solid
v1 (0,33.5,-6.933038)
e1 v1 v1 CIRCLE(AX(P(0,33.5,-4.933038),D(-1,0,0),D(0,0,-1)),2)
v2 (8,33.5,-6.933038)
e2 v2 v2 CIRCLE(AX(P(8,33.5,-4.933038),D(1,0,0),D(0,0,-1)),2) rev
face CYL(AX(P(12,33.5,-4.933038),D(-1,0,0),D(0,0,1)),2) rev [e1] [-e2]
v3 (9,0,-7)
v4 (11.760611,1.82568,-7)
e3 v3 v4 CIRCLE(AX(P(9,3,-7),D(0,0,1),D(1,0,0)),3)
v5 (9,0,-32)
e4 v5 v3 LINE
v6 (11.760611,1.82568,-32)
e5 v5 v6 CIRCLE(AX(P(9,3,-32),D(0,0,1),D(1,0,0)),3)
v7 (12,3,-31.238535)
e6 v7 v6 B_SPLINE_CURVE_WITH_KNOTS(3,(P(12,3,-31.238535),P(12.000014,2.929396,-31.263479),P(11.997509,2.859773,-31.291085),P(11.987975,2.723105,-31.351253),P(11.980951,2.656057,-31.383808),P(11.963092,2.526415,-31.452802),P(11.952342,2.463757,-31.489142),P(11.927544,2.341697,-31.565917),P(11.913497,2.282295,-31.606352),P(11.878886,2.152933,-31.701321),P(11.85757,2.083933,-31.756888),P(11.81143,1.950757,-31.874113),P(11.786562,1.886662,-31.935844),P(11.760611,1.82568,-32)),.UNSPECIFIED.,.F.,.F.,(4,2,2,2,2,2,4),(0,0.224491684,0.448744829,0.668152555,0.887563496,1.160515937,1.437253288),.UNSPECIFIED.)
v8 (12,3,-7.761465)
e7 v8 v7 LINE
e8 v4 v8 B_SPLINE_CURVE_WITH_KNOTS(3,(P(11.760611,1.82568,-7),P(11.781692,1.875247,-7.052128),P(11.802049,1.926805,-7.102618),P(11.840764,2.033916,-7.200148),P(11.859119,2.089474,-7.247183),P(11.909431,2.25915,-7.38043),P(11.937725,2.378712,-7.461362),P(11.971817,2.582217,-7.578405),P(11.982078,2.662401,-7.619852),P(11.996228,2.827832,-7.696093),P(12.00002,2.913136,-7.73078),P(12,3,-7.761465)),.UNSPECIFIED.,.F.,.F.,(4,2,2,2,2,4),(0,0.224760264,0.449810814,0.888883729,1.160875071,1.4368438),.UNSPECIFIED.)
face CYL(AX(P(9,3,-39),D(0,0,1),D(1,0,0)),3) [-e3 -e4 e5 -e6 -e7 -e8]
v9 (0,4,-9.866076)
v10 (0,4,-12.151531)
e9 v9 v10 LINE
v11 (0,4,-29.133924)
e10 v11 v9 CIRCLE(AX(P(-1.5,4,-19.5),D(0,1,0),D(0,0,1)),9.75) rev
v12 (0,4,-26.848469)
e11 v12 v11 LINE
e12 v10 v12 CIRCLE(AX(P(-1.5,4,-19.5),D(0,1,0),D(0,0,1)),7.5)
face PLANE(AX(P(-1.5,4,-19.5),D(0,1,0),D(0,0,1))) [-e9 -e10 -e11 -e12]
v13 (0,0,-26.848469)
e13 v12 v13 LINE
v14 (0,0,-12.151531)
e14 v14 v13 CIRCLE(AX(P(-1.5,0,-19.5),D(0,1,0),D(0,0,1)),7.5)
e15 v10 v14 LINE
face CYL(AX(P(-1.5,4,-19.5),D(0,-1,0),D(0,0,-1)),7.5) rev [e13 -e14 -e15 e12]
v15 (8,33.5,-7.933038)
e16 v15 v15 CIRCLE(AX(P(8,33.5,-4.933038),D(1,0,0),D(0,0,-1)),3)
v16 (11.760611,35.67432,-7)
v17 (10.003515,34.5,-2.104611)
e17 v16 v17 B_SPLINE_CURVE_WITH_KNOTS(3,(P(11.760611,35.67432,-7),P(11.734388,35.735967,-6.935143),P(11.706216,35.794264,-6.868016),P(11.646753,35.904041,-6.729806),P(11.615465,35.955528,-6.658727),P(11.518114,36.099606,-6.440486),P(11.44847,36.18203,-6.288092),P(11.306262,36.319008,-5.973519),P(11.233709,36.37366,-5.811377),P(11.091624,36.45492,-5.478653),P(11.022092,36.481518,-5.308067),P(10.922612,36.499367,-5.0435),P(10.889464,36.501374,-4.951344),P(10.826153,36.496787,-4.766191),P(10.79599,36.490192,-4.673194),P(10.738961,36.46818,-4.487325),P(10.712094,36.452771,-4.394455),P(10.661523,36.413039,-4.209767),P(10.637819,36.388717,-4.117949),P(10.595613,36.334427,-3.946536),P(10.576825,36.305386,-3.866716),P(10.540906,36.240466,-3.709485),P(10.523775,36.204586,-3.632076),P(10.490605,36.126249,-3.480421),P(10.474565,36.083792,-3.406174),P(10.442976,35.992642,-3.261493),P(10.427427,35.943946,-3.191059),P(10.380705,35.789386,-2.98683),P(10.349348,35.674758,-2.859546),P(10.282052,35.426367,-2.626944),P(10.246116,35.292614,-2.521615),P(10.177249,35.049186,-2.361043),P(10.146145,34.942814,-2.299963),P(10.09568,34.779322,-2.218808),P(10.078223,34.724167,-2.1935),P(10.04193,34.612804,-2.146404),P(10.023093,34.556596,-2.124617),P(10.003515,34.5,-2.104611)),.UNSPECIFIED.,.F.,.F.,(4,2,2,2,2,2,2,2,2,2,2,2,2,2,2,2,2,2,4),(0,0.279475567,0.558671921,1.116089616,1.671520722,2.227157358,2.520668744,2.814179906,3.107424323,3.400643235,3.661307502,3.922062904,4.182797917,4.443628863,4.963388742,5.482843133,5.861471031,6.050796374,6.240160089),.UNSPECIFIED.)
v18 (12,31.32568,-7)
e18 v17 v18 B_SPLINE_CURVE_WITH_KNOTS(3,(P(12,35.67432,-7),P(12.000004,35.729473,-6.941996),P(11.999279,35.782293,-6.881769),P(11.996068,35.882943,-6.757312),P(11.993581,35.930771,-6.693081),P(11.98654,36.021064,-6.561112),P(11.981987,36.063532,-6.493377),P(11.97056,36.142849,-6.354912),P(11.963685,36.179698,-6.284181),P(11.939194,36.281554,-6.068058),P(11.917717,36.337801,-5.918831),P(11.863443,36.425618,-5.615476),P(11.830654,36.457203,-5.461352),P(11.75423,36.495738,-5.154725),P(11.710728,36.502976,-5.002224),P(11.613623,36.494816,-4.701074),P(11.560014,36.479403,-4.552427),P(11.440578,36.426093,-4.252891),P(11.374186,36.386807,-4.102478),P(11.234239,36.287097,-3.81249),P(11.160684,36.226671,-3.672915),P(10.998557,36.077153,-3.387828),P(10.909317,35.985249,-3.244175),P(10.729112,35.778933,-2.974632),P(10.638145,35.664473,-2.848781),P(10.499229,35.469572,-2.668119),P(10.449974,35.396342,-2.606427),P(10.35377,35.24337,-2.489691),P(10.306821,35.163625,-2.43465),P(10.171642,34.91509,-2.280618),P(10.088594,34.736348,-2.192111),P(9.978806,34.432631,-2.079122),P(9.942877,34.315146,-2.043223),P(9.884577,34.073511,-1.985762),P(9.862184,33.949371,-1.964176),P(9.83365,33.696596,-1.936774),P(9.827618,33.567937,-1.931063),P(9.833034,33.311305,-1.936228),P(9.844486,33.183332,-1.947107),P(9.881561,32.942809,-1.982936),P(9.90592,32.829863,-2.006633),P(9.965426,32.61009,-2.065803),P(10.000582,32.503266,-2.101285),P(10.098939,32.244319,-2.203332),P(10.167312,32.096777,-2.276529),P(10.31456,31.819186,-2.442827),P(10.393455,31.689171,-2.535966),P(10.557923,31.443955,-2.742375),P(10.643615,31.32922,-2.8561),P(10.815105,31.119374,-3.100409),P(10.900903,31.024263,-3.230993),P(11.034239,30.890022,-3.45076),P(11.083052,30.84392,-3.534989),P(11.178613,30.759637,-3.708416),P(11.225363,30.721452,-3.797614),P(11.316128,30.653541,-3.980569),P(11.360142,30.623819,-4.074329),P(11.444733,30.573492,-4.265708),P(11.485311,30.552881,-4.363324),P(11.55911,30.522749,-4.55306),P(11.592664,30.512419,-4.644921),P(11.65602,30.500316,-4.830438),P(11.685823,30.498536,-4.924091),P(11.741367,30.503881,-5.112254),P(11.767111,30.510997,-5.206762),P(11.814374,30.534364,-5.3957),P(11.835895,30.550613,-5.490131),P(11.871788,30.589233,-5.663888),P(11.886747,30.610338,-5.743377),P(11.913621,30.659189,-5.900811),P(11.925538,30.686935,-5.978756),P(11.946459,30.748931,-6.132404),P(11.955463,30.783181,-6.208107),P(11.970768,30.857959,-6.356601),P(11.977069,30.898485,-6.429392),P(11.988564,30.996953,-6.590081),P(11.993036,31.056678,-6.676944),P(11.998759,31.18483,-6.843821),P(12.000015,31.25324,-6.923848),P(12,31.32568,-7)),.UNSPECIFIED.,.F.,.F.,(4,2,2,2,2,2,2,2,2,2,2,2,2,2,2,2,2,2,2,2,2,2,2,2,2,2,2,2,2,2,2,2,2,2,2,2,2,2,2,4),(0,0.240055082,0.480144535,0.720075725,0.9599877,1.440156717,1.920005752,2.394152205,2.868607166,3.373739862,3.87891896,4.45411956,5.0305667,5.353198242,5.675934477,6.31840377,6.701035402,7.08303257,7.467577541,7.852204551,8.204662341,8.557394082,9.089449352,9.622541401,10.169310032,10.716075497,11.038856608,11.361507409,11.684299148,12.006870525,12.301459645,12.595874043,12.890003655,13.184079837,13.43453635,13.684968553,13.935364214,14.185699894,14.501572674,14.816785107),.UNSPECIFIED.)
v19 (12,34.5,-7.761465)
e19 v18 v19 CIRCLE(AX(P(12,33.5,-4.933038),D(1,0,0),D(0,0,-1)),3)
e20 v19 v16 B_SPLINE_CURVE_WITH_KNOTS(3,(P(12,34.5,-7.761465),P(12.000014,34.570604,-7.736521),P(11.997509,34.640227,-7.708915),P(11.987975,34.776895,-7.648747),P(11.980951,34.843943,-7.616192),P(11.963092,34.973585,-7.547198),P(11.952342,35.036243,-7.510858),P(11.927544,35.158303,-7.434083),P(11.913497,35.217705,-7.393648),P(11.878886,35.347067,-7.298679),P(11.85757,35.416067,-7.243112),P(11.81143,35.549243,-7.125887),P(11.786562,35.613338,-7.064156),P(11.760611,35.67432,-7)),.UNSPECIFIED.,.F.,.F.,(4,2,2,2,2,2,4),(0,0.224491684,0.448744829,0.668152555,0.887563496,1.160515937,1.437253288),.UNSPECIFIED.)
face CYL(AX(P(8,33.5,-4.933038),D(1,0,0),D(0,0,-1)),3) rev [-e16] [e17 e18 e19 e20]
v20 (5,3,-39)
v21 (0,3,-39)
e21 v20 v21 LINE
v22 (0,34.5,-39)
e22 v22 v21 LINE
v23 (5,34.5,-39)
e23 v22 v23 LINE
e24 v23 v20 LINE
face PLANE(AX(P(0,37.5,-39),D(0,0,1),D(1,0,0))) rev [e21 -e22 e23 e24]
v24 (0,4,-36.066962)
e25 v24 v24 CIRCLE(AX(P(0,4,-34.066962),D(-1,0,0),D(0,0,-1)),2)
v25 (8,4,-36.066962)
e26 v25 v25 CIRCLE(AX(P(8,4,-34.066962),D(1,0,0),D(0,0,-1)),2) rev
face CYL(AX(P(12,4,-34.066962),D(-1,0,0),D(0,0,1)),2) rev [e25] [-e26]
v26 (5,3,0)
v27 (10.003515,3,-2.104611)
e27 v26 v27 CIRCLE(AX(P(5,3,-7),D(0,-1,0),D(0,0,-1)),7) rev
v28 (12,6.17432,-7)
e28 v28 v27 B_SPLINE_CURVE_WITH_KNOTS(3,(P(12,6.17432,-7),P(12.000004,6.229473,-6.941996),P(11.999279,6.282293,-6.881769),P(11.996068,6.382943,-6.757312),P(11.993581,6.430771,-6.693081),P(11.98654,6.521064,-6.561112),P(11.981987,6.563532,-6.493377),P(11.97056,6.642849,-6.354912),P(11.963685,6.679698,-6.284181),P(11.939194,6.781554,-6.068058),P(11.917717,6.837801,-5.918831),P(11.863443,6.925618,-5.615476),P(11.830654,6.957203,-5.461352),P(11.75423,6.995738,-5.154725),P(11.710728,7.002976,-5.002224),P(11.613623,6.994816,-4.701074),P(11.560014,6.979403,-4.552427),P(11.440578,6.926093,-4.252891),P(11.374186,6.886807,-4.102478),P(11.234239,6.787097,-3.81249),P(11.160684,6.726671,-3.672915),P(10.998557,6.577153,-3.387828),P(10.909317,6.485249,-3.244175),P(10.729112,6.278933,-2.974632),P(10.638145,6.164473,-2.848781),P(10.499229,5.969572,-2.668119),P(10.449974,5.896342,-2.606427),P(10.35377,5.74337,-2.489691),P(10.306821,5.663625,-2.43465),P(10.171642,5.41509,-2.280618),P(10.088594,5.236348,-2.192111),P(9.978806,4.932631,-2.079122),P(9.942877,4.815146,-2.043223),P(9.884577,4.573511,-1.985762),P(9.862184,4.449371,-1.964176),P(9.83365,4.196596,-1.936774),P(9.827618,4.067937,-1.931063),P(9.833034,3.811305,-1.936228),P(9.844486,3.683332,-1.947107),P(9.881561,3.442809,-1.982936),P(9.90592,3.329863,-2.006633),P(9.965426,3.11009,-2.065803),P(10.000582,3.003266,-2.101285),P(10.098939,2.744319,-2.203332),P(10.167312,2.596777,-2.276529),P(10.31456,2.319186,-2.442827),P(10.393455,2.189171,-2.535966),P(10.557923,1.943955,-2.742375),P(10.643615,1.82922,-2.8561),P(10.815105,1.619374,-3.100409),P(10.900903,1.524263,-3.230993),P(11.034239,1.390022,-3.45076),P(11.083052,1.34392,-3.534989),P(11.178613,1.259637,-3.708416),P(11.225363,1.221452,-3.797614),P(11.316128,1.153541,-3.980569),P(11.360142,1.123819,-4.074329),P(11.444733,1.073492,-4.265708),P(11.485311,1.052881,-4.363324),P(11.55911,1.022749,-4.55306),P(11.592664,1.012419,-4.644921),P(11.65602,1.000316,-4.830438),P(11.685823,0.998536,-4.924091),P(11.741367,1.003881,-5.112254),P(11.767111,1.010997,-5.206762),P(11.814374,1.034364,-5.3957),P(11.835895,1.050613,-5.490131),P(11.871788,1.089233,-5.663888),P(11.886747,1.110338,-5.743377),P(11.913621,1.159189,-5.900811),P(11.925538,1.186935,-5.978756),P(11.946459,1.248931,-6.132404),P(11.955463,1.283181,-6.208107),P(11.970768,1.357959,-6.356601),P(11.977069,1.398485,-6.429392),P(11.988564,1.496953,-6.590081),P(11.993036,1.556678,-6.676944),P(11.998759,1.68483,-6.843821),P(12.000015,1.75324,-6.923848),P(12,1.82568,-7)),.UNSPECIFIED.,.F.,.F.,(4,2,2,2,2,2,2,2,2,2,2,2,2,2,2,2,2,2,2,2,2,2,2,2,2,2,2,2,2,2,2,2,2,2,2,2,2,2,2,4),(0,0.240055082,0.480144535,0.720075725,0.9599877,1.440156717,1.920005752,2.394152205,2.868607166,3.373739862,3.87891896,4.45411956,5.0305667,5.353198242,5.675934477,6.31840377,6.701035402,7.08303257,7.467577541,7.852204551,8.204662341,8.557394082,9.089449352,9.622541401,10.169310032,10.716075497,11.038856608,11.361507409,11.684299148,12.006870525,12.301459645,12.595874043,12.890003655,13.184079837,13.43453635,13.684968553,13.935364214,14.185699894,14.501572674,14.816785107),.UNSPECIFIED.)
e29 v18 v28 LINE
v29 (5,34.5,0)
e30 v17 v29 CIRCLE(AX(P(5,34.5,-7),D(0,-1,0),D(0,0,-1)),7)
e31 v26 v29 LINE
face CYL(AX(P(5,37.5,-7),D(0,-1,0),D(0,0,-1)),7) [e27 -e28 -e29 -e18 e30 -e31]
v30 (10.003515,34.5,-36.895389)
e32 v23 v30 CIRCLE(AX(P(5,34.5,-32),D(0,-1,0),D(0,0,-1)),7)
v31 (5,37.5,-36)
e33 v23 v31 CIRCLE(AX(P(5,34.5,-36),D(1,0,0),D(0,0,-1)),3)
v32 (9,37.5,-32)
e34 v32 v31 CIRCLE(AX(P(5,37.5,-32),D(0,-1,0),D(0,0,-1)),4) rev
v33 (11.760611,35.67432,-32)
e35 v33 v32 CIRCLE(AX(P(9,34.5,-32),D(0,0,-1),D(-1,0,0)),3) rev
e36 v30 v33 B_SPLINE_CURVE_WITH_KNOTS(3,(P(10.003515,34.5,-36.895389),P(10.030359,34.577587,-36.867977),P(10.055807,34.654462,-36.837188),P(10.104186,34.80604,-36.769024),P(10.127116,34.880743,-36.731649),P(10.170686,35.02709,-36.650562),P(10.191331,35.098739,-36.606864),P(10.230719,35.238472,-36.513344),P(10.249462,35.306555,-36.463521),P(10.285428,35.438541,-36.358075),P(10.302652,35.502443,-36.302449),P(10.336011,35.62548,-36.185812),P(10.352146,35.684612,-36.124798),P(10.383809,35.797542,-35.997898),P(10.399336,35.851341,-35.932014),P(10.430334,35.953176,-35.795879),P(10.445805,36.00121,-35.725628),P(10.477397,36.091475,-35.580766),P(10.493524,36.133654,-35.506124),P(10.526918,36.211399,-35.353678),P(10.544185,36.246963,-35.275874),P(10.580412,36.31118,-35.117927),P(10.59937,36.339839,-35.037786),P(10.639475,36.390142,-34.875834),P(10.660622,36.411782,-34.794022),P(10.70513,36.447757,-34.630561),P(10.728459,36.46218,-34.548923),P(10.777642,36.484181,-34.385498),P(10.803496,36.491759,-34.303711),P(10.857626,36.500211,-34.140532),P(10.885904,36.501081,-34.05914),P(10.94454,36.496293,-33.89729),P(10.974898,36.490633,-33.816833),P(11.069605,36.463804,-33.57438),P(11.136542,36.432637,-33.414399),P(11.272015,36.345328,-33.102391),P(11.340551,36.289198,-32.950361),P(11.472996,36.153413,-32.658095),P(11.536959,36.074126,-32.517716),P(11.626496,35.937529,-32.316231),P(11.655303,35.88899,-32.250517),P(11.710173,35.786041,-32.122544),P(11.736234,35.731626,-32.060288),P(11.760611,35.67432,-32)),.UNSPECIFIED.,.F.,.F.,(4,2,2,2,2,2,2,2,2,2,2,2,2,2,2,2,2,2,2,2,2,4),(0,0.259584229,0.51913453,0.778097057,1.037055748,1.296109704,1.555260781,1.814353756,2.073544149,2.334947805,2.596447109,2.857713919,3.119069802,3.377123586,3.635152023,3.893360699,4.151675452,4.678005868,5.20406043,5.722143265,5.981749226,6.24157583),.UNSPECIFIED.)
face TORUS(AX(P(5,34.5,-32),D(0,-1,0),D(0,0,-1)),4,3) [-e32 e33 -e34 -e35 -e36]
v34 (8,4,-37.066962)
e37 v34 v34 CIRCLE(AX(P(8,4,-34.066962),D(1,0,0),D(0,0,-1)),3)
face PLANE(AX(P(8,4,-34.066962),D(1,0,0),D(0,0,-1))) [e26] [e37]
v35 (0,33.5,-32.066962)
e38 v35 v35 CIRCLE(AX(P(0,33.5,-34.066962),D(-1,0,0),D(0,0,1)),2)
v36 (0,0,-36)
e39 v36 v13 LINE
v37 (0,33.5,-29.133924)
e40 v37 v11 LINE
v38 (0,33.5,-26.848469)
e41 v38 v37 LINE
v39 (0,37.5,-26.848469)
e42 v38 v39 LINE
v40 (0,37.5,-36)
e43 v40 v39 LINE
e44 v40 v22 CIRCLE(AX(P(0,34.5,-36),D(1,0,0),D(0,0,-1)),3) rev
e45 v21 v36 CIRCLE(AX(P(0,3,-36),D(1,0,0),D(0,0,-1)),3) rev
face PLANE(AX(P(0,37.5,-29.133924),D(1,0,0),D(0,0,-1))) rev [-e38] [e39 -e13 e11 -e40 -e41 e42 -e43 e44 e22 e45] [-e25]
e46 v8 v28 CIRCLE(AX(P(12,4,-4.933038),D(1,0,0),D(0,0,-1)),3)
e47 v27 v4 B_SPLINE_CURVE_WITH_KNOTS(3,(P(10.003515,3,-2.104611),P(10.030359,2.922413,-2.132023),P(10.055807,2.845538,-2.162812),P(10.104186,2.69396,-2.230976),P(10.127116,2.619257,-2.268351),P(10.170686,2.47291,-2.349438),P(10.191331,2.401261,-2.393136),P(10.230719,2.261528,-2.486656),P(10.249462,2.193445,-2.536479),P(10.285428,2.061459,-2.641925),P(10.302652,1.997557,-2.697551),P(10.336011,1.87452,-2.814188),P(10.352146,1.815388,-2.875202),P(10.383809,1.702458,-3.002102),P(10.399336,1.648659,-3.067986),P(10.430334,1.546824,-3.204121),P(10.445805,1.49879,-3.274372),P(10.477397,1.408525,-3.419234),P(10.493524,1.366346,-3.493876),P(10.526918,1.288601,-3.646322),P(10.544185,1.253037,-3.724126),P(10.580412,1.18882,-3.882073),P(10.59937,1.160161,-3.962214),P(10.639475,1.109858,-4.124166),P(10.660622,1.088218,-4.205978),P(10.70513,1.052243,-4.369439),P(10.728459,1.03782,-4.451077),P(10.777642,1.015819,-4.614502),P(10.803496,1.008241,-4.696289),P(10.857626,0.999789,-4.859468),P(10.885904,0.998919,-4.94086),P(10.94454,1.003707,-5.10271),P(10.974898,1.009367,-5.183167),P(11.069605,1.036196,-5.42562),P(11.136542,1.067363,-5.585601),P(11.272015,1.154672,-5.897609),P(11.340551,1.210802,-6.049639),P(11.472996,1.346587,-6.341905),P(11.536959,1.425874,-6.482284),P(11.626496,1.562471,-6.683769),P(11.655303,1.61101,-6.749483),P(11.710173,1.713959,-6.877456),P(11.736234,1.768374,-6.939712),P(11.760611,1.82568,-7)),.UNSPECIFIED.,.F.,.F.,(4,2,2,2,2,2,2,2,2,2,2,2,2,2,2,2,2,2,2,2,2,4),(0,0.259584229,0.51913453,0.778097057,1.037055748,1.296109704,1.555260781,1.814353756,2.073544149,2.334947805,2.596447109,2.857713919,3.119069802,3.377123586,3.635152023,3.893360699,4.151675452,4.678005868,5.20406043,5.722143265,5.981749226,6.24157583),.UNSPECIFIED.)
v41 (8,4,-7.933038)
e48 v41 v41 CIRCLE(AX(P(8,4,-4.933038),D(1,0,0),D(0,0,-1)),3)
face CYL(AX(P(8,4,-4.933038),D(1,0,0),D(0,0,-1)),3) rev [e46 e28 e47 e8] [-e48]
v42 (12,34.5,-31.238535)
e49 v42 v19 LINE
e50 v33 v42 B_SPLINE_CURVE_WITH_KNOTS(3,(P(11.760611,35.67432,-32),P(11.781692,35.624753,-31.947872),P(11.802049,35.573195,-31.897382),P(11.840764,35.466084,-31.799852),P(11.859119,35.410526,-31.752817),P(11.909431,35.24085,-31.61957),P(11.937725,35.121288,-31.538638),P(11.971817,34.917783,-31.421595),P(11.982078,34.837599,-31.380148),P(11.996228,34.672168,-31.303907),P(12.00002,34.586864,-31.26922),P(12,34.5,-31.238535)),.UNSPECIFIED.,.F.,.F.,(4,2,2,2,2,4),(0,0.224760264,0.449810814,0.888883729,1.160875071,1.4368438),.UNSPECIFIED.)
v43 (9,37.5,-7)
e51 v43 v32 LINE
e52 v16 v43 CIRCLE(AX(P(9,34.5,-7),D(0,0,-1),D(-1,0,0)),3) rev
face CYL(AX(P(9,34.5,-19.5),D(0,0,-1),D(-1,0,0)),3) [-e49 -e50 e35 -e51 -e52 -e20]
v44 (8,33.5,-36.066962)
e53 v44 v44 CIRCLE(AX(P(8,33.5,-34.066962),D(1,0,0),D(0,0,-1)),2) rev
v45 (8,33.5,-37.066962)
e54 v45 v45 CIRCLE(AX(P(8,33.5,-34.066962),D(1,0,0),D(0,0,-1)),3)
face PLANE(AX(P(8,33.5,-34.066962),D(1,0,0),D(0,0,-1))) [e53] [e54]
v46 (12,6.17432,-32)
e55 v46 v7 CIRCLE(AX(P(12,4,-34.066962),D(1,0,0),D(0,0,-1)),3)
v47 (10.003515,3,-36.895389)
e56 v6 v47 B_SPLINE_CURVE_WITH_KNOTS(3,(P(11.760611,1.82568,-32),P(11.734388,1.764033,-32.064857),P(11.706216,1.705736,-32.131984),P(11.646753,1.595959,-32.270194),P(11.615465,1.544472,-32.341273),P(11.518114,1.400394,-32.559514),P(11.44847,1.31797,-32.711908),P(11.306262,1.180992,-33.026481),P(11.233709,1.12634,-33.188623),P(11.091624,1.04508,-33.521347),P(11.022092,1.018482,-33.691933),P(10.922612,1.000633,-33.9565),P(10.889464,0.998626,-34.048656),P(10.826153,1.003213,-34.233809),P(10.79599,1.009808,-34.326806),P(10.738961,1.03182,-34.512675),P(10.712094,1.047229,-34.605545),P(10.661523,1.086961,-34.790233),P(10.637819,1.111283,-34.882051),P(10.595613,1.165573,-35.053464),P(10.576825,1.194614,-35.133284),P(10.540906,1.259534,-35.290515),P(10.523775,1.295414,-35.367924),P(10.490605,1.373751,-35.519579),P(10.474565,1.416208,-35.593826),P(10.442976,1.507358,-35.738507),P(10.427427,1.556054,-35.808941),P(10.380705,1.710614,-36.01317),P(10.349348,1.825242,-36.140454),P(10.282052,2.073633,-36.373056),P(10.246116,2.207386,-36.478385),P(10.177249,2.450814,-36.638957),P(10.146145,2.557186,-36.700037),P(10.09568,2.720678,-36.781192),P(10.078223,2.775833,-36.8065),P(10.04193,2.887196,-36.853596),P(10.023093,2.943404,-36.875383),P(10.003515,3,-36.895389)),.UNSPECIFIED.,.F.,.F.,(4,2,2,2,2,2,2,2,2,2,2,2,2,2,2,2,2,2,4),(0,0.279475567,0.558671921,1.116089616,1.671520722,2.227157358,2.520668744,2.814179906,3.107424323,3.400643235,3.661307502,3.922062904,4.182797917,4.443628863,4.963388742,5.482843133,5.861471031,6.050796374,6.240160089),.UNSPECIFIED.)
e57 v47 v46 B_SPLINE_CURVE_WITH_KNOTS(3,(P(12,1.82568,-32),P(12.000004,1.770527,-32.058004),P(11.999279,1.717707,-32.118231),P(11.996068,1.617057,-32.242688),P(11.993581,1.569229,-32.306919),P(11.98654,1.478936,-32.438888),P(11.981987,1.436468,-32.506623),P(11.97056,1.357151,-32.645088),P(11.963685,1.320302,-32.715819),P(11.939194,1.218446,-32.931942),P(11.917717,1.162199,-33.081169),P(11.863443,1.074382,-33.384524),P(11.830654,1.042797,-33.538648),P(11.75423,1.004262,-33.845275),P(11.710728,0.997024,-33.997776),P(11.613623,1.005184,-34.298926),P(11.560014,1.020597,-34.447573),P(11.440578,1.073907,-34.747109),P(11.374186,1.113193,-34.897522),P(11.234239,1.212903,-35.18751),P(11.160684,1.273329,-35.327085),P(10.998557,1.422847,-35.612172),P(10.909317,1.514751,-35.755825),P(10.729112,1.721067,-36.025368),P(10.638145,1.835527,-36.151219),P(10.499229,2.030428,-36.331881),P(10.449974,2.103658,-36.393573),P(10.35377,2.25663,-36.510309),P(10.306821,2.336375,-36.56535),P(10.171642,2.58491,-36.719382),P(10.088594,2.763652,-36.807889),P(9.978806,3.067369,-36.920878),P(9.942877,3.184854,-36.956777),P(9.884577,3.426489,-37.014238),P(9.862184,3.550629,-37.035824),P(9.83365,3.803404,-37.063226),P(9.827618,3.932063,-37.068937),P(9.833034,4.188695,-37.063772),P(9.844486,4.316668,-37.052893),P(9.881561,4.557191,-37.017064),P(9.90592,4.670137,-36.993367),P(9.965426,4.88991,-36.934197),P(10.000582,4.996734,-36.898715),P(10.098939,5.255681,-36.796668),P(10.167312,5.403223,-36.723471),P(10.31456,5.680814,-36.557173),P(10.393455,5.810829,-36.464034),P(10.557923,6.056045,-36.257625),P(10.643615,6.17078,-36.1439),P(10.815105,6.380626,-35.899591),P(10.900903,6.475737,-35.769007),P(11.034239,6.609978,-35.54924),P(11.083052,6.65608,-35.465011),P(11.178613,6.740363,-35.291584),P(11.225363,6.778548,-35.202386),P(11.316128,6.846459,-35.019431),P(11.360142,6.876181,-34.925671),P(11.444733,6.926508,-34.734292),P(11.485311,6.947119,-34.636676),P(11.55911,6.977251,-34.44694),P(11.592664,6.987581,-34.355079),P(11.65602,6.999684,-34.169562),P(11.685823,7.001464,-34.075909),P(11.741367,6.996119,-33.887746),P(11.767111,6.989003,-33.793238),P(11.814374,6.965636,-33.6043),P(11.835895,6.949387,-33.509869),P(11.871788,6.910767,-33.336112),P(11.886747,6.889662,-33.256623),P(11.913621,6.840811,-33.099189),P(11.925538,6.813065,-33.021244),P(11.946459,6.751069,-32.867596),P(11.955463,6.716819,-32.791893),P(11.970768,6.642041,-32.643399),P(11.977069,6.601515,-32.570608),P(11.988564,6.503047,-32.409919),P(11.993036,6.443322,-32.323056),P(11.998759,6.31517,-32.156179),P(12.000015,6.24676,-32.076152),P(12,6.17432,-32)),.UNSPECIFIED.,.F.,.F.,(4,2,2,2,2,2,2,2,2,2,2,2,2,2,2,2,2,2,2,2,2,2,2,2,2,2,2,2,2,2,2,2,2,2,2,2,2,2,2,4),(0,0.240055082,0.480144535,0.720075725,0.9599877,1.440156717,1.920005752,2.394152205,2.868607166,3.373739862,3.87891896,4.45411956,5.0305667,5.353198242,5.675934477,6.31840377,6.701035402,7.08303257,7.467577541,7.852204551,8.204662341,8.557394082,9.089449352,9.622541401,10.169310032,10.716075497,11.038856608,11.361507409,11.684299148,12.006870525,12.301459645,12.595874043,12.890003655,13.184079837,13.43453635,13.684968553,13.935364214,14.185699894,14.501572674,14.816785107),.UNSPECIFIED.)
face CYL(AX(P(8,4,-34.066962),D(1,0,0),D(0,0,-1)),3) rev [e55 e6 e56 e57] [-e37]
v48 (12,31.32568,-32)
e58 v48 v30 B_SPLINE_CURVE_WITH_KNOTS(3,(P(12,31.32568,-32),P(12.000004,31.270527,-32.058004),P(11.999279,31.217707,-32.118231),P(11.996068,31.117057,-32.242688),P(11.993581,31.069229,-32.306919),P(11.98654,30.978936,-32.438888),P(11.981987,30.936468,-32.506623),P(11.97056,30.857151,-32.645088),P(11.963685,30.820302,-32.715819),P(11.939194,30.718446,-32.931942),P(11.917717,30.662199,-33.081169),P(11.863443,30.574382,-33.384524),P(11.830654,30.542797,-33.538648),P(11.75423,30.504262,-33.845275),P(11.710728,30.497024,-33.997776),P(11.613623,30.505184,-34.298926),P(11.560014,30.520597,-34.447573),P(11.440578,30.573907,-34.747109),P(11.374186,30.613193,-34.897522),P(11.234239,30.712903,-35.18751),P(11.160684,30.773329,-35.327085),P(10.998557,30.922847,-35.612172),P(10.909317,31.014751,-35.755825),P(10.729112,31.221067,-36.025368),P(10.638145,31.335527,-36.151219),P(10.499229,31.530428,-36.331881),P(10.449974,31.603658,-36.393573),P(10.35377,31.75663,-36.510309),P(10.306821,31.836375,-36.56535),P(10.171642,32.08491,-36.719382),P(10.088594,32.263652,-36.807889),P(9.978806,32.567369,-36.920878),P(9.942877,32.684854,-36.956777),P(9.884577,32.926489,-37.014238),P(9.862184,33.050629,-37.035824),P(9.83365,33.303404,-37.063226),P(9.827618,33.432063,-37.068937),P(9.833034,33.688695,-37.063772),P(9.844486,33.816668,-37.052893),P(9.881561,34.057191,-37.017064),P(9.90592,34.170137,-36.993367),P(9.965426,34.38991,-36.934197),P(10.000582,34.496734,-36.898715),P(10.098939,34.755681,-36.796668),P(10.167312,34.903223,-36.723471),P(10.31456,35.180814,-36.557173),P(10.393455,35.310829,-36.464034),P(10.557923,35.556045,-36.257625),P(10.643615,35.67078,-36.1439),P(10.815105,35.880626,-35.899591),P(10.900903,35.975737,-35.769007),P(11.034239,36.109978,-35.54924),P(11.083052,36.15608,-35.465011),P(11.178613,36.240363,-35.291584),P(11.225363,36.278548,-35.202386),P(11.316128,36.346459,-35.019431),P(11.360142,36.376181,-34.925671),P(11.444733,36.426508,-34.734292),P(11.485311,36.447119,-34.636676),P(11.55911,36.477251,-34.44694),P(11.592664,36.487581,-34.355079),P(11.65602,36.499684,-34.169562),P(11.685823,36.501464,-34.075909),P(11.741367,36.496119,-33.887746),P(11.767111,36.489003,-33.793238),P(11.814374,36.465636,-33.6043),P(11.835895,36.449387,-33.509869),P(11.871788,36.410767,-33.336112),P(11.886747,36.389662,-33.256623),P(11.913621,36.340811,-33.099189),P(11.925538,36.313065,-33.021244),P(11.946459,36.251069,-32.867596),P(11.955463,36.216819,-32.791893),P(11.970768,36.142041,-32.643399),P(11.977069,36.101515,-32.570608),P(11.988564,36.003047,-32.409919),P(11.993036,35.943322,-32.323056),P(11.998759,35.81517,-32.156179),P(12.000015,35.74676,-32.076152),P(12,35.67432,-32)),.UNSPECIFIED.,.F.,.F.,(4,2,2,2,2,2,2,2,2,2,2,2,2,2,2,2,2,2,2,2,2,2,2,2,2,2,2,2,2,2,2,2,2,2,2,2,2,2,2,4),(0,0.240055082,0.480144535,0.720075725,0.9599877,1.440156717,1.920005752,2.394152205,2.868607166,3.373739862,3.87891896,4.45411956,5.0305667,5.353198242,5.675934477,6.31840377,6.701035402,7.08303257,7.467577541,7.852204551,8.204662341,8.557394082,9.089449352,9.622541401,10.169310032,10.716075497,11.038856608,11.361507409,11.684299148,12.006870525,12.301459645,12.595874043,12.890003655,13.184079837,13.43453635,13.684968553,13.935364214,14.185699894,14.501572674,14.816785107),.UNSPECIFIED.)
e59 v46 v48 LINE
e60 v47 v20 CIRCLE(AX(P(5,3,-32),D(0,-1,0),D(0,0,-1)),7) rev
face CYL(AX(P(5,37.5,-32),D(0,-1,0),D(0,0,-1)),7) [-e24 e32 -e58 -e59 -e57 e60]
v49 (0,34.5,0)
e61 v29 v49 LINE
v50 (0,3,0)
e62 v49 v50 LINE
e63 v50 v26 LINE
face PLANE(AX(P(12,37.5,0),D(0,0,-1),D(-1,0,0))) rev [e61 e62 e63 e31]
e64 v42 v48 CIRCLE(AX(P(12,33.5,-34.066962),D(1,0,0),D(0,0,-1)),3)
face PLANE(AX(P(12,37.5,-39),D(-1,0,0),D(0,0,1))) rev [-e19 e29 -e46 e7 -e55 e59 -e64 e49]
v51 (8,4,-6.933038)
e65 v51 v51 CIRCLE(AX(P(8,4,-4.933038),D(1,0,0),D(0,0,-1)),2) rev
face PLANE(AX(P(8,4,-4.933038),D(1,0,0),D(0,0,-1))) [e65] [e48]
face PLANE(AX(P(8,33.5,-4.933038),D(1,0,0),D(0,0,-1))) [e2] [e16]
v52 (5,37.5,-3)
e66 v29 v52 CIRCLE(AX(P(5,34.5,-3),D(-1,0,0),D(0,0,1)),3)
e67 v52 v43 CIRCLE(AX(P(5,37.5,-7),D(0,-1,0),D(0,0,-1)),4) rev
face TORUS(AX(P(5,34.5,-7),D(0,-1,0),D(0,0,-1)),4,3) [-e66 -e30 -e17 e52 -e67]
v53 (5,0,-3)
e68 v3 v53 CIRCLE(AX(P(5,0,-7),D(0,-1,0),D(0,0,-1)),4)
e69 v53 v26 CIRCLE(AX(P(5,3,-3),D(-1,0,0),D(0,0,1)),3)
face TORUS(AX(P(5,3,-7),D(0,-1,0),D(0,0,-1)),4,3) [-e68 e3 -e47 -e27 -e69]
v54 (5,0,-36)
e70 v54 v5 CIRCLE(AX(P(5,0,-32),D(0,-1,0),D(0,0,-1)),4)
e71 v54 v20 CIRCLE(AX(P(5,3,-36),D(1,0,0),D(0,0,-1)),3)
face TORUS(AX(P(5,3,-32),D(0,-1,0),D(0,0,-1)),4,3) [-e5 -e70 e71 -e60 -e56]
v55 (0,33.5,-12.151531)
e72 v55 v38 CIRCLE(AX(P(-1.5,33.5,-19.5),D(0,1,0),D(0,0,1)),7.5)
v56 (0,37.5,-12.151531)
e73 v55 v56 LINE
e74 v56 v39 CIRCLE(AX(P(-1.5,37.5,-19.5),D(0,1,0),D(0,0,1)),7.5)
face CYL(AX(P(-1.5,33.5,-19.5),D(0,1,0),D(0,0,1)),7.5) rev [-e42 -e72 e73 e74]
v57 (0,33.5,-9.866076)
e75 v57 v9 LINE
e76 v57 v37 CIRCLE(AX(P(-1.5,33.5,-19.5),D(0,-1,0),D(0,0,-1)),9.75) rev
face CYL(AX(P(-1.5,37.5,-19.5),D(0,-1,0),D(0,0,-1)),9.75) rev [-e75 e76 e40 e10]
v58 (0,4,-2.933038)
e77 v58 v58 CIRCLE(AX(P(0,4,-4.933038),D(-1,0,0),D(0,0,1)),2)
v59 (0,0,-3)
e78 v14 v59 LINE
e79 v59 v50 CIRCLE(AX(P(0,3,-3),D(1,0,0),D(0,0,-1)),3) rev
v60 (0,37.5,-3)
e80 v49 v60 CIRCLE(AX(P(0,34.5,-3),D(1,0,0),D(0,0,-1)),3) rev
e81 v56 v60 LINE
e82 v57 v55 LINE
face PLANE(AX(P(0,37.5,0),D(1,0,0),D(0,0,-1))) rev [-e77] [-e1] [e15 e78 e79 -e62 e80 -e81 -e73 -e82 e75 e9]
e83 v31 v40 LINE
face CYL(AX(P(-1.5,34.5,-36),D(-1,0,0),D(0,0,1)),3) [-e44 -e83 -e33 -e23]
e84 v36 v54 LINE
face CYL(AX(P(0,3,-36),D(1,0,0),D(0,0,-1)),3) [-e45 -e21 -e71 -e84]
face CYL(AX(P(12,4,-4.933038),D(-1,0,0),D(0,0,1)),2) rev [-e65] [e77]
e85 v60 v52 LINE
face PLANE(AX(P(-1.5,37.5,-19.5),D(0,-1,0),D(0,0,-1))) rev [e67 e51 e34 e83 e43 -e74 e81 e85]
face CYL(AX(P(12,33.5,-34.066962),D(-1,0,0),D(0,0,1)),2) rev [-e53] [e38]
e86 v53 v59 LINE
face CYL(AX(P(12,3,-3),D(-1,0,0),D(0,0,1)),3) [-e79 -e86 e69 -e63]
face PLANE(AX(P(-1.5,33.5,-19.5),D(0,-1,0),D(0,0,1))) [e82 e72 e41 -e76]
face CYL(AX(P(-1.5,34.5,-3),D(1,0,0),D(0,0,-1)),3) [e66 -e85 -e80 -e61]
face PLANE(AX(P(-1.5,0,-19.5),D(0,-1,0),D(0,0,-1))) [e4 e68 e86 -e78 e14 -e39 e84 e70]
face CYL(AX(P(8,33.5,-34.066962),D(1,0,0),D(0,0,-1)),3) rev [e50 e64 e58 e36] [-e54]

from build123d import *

# Parameters (mm, degrees)
BOSS_EXTRU_1_DEPTH      = 37.5
BOSS_EXTRU_2_DEPTH      = 4
ESQUISSE3_R             = 2
ENL_V_MAT_EXTRU_1_DEPTH = 56.418859606
ESQUISSE5_R             = 3
ENL_V_MAT_EXTRU_2_DEPTH = 4
CONG_1_R                = 7
CONG_2_R                = 3


with BuildPart() as part:
    # Esquisse1 → Boss.-Extru.1 (new body)
    with BuildSketch(Plane(origin=(0, 0, 0), x_dir=(1, 0, 0), z_dir=(0, 1, 0))):
        with BuildLine():
            Line((0, 29.133924434), (0, 39))
            Line((0, 39), (12, 39))
            Line((12, 39), (12, 0))
            Line((12, 0), (0, 0))
            Line((0, 0), (0, 9.866075566))
            ThreePointArc((0, 9.866075566), (8.25, 19.5), (0, 29.133924434))
        make_face()
    extrude(amount=BOSS_EXTRU_1_DEPTH)

    # Esquisse2 → Boss.-Extru.2 (add)
    with BuildSketch(Plane.XZ):
        with BuildLine():
            Line((0, 0), (12, 0))
            Line((12, 0), (12, -39))
            Line((12, -39), (0, -39))
            Line((0, -39), (0, -26.848469228))
            ThreePointArc((0, -26.848469228), (6, -19.5), (0, -12.151530772))
            Line((0, -12.151530772), (0, 0))
        make_face()
    boss_extru_2 = extrude(amount=-BOSS_EXTRU_2_DEPTH)

    # Symétrie1: Boss.-Extru.2 across plane
    add(boss_extru_2.mirror(Plane.ZX.offset(18.75)))

    # Esquisse3 → Enlèv. mat.-Extru.1 (cut, through all)
    with BuildSketch(Plane.ZY):
        with Locations((-34.066962217, 33.5)):
            Circle(ESQUISSE3_R)
        with Locations(Location((-34.066962217, 4, 0), (0, 0, 180))):
            Circle(ESQUISSE3_R)
        with Locations((-4.933037783, 4)):
            Circle(ESQUISSE3_R)
        with Locations(Location((-4.933037783, 33.5, 0), (0, 0, 180))):
            Circle(ESQUISSE3_R)
    extrude(amount=-ENL_V_MAT_EXTRU_1_DEPTH, mode=Mode.SUBTRACT)

    # Esquisse5 → Enlèv. mat.-Extru.2 (cut)
    with BuildSketch(Plane(origin=(12, 0, 0), x_dir=(0, 0, -1), z_dir=(1, 0, 0))):
        with Locations((4.933037783, 33.5)):
            Circle(ESQUISSE5_R)
        with Locations((34.066962217, 33.5)):
            Circle(ESQUISSE5_R)
        with Locations((34.066962217, 4)):
            Circle(ESQUISSE5_R)
        with Locations((4.933037783, 4)):
            Circle(ESQUISSE5_R)
    extrude(amount=-ENL_V_MAT_EXTRU_2_DEPTH, mode=Mode.SUBTRACT)

    # Congé1
    # the kernel refuses this fillet: 7 mm, written as the material it takes off along each edge
    with BuildSketch(Plane(origin=(12, 55, -39), x_dir=(-1, 0, 0), z_dir=(0, -1, 0)), Plane(origin=(12, 55, 0), x_dir=(0, 0, -1), z_dir=(0, -1, 0))) as cong_1_piece_1:
        with BuildLine():
            CenterArc((CONG_1_R, -CONG_1_R), CONG_1_R, 90, 90)
            Line((0, -CONG_1_R), (0, 0))
            Line((0, 0), (CONG_1_R, 0))
        make_face()
    extrude(amount=72.5, mode=Mode.SUBTRACT)

    # Congé2
    # the kernel refuses this fillet: 3 mm, written as the material it takes off along each edge
    with BuildSketch(Plane(origin=(5, 0, 0), x_dir=(0, 0, -1), z_dir=(-1, 0, 0)), Plane(origin=(-7.5, 0, -39), x_dir=(0, 0, 1), z_dir=(1, 0, 0)), Plane(origin=(-7.5, 37.5, -39), x_dir=(0, -1, 0), z_dir=(1, 0, 0))) as cong_2_piece_1:
        with BuildLine():
            CenterArc((CONG_2_R, -CONG_2_R), CONG_2_R, 90, 90)
            Line((0, -CONG_2_R), (0, 0))
            Line((0, 0), (CONG_2_R, 0))
        make_face()
    extrude(amount=12.5, mode=Mode.SUBTRACT)
    with BuildSketch(Plane(origin=(5, 0, -7), x_dir=(0, 0, 1), z_dir=(-1, 0, 0))) as cong_2_piece_2:
        with BuildLine():
            CenterArc((7 - CONG_2_R, CONG_2_R), CONG_2_R, 270, 90)
            Line((7, CONG_2_R), (7, 0))
            Line((7, 0), (7 - CONG_2_R, 0))
        make_face()
    revolve(axis=Axis((5, 0, -7), (0, 1, 0)), revolution_arc=90, mode=Mode.SUBTRACT)
    with BuildSketch(Plane(origin=(5, 0, -32), x_dir=(1, 0, 0), z_dir=(0, 0, 1))) as cong_2_piece_3:
        with BuildLine():
            CenterArc((7 - CONG_2_R, CONG_2_R), CONG_2_R, 270, 90)
            Line((7, CONG_2_R), (7, 0))
            Line((7, 0), (7 - CONG_2_R, 0))
        make_face()
    revolve(axis=Axis((5, 0, -32), (0, 1, 0)), revolution_arc=90, mode=Mode.SUBTRACT)
    with BuildSketch(Plane(origin=(5, 37.5, 0), x_dir=(0, 0, -1), z_dir=(-1, 0, 0))) as cong_2_piece_4:
        with BuildLine():
            CenterArc((CONG_2_R, CONG_2_R), CONG_2_R, 180, 90)
            Line((0, CONG_2_R), (0, 0))
            Line((0, 0), (CONG_2_R, 0))
        make_face()
    extrude(amount=12.5, mode=Mode.SUBTRACT)
    with BuildSketch(Plane(origin=(5, 37.5, -7), x_dir=(0, 0, 1), z_dir=(-1, 0, 0))) as cong_2_piece_5:
        with BuildLine():
            CenterArc((7 - CONG_2_R, -CONG_2_R), CONG_2_R, 0, 90)
            Line((7, -CONG_2_R), (7, 0))
            Line((7, 0), (7 - CONG_2_R, 0))
        make_face()
    revolve(axis=Axis((5, 37.5, -7), (0, 1, 0)), revolution_arc=90, mode=Mode.SUBTRACT)
    with BuildSketch(Plane(origin=(5, 37.5, -32), x_dir=(1, 0, 0), z_dir=(0, 0, 1))) as cong_2_piece_6:
        with BuildLine():
            CenterArc((7 - CONG_2_R, -CONG_2_R), CONG_2_R, 0, 90)
            Line((7, -CONG_2_R), (7, 0))
            Line((7, 0), (7 - CONG_2_R, 0))
        make_face()
    revolve(axis=Axis((5, 37.5, -32), (0, 1, 0)), revolution_arc=90, mode=Mode.SUBTRACT)
    with BuildSketch(Plane(origin=(12, 0, -32), x_dir=(-1, 0, 0), z_dir=(0, 0, 1))) as cong_2_piece_7:
        with BuildLine():
            CenterArc((CONG_2_R, -CONG_2_R), CONG_2_R, 90, 90)
            Line((0, -CONG_2_R), (0, 0))
            Line((0, 0), (CONG_2_R, 0))
        make_face()
    extrude(amount=25, mode=Mode.SUBTRACT)
    with BuildSketch(Plane(origin=(12, 37.5, -32), x_dir=(-1, 0, 0), z_dir=(0, 0, 1))) as cong_2_piece_8:
        with BuildLine():
            CenterArc((CONG_2_R, CONG_2_R), CONG_2_R, 180, 90)
            Line((0, CONG_2_R), (0, 0))
            Line((0, 0), (CONG_2_R, 0))
        make_face()
    extrude(amount=25, mode=Mode.SUBTRACT)


solid = part.part
